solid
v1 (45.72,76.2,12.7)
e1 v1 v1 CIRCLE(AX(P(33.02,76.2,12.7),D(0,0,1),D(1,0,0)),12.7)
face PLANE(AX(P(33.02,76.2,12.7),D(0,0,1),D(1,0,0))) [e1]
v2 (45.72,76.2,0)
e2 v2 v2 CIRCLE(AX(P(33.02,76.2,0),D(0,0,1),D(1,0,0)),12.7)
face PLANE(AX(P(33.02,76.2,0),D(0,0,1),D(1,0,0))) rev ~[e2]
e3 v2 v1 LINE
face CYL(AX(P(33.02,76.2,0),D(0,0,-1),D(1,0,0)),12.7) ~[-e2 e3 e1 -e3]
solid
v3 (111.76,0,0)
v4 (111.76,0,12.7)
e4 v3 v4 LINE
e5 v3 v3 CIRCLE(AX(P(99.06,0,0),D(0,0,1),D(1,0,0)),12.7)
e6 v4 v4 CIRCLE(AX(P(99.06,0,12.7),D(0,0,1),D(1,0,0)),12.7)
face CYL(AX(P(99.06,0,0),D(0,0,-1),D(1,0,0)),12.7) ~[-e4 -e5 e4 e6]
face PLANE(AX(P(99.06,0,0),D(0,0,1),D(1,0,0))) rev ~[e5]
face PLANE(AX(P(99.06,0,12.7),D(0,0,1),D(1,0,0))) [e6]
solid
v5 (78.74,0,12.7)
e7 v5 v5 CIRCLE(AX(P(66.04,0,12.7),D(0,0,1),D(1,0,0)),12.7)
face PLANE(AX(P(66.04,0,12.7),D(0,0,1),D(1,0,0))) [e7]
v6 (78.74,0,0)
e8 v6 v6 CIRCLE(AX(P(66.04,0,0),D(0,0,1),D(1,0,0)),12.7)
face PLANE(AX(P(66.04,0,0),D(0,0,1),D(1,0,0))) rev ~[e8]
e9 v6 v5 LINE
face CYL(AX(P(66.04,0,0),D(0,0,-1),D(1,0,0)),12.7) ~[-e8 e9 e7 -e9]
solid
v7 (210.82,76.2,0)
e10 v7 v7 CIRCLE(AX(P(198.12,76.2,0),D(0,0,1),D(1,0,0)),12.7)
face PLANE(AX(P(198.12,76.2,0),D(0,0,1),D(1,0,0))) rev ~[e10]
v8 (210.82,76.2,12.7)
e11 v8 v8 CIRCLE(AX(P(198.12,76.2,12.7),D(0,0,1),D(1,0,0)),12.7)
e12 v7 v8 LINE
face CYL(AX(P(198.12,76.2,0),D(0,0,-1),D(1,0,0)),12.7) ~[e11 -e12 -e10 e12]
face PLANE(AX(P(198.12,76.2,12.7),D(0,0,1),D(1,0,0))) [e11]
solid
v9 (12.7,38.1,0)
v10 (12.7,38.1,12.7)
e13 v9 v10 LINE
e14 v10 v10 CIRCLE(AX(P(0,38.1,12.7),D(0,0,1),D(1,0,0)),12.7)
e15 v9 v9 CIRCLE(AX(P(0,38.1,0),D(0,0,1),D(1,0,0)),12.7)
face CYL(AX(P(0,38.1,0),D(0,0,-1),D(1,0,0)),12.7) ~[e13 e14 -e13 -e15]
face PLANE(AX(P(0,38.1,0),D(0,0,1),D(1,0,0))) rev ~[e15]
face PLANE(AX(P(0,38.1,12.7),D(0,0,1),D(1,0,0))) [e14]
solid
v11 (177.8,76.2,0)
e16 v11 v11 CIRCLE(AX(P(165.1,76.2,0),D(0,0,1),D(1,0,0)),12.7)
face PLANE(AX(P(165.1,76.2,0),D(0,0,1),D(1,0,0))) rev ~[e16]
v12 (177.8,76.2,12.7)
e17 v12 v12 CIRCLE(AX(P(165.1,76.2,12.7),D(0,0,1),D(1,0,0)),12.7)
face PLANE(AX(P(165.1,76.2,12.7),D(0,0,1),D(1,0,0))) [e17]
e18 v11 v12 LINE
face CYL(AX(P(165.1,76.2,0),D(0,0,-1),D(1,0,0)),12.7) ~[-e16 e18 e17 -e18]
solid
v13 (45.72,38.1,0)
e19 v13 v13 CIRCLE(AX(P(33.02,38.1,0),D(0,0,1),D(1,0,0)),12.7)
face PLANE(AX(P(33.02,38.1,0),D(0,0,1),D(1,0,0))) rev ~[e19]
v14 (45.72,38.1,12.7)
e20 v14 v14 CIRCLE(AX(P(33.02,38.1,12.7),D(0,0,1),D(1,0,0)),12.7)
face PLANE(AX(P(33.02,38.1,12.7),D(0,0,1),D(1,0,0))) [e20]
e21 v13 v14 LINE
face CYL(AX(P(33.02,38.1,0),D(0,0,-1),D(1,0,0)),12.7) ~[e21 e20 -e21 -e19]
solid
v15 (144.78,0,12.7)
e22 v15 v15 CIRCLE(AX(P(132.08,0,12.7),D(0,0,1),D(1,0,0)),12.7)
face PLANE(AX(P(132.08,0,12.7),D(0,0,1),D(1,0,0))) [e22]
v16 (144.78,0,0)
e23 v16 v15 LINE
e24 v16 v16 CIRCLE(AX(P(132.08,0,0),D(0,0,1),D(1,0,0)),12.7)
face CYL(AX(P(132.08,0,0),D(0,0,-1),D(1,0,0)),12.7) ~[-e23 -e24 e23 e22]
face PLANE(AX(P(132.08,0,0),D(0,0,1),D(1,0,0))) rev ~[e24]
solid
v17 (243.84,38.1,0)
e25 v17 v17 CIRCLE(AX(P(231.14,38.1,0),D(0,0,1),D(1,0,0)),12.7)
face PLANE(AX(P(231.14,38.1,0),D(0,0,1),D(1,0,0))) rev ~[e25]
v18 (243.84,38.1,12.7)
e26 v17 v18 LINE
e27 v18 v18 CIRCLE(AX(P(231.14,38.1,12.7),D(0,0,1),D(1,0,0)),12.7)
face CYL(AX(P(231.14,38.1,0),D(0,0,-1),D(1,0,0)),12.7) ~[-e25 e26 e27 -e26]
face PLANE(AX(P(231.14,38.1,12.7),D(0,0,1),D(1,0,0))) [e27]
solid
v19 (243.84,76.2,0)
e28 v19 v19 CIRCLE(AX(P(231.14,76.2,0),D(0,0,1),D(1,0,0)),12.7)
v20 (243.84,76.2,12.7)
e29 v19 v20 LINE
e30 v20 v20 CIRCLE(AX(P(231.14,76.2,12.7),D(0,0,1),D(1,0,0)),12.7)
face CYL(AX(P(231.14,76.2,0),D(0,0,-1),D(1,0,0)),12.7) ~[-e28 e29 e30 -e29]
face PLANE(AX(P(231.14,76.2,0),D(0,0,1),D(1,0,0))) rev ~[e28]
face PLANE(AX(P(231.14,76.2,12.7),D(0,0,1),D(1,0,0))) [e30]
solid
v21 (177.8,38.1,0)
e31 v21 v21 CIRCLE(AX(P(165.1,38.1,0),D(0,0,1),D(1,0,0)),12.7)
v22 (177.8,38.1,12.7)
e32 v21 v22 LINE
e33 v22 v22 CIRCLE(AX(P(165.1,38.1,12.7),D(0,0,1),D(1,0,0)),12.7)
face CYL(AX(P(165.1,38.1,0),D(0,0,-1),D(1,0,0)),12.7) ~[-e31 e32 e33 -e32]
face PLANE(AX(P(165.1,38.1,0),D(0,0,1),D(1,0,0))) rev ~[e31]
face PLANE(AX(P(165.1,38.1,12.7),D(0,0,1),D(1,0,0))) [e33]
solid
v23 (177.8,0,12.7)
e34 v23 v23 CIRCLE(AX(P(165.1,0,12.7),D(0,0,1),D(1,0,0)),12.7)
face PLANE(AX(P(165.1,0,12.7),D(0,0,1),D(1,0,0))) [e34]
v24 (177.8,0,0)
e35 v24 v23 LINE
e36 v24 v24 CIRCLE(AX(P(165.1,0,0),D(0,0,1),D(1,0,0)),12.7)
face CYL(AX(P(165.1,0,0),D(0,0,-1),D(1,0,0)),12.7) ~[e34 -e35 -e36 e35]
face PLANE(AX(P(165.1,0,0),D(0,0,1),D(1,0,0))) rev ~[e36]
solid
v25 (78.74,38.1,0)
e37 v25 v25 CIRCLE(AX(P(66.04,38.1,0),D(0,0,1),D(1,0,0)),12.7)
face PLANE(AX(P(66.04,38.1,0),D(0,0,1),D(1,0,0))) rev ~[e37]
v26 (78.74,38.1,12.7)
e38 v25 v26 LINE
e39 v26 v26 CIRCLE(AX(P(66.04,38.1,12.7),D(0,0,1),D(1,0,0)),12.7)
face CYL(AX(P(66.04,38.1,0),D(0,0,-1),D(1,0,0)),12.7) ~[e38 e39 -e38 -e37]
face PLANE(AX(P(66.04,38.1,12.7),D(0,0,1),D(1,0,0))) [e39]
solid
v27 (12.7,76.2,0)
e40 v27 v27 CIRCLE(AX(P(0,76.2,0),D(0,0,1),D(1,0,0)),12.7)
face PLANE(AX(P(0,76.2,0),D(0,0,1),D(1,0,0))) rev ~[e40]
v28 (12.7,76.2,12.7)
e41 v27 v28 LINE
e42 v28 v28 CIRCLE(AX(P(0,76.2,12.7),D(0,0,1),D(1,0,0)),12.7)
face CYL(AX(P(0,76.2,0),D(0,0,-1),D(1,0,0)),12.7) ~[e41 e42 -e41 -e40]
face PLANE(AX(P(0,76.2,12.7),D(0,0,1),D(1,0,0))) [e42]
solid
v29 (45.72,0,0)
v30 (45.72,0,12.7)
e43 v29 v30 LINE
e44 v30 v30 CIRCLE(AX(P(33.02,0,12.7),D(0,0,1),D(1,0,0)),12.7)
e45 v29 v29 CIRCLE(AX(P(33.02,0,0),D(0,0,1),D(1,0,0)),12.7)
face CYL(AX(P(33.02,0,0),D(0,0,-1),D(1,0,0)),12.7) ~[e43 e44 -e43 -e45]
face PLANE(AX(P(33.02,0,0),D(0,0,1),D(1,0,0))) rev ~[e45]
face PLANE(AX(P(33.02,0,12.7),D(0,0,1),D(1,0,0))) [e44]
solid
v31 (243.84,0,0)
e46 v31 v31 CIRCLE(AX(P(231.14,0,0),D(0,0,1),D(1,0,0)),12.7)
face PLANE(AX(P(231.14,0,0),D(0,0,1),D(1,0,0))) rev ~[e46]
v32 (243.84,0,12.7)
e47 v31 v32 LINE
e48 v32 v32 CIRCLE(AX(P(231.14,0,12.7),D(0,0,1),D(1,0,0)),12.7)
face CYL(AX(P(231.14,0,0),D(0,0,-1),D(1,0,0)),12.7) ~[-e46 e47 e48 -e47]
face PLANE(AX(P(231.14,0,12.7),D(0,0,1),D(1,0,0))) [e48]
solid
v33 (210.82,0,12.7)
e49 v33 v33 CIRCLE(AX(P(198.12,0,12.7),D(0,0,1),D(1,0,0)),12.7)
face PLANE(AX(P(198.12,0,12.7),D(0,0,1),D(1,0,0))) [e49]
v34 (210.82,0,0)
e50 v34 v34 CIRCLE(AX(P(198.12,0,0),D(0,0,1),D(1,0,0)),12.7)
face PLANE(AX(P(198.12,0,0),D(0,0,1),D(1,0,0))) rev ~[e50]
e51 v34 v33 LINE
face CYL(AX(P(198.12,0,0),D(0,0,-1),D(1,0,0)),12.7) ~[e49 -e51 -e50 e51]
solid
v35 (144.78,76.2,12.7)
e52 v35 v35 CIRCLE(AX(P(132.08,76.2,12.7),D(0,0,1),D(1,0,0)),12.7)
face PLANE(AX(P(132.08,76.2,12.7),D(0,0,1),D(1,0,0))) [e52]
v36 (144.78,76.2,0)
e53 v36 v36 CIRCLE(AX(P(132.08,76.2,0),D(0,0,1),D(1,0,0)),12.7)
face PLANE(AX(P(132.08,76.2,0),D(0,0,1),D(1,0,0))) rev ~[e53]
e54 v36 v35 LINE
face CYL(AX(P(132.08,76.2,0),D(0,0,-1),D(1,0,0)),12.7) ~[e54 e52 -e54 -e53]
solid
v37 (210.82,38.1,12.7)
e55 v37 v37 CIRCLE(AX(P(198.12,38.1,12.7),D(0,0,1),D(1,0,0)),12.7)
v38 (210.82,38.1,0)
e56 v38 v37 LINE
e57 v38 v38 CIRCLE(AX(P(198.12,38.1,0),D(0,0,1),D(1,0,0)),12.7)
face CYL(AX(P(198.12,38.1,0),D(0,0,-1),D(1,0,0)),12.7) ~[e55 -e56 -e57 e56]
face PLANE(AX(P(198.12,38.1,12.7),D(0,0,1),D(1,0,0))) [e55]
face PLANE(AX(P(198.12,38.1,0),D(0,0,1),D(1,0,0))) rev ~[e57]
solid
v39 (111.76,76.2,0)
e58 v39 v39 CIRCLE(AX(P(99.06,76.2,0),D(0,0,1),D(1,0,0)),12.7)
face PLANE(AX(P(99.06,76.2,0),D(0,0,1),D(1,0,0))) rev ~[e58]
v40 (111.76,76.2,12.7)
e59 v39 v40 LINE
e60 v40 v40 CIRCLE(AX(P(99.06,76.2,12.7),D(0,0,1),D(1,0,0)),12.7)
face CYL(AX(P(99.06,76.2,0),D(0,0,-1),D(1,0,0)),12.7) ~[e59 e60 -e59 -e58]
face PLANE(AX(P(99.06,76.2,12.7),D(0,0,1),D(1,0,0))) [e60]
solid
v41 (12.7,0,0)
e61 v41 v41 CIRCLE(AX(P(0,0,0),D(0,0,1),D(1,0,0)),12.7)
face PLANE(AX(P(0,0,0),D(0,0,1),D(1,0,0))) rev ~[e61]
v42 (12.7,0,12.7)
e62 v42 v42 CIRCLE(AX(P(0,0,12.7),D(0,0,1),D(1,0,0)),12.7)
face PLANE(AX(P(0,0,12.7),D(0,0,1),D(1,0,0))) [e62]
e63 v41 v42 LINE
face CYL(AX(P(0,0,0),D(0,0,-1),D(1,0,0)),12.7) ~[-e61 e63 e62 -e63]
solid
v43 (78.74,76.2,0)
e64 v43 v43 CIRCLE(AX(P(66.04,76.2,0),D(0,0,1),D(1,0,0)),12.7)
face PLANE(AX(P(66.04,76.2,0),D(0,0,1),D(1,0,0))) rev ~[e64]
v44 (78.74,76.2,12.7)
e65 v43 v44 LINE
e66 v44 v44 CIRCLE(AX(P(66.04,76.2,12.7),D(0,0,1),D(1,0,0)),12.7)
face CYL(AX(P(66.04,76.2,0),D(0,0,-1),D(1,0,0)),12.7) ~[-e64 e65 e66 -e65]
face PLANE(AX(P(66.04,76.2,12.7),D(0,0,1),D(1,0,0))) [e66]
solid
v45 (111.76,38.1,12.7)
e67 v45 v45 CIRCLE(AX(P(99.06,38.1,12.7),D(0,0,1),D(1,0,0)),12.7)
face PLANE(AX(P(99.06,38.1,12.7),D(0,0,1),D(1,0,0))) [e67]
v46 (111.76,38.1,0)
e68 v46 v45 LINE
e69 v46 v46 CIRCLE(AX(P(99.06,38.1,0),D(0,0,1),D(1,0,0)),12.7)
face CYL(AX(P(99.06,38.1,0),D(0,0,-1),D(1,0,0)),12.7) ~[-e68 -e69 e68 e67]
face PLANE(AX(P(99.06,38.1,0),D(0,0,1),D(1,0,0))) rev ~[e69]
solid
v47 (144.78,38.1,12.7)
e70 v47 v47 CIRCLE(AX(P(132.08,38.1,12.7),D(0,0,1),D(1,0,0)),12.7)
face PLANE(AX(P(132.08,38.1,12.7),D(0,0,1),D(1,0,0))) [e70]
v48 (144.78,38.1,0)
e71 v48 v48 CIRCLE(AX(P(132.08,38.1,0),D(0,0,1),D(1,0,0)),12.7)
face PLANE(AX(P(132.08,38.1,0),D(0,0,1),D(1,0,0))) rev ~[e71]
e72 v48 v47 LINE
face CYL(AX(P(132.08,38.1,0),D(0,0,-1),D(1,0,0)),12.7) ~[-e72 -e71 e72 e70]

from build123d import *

# Parameters (mm, degrees)
F0_R     = 12.7
F1_DEPTH = 12.7


# Not quite as in the source:
# - a feature names something its author has since deleted; it is built from what else it names


with BuildPart() as f1:
    # F0 (on Top) → F1 (new body)
    with BuildSketch(Plane.XY):
        with Locations((231.14, 0)):
            Circle(F0_R)
    extrude(amount=F1_DEPTH)


with BuildPart() as f1b:
    # F0 (on Top) → F1, piece 2 (new body)
    with BuildSketch(Plane.XY):
        with Locations((198.12, 0)):
            Circle(F0_R)
    extrude(amount=F1_DEPTH)


with BuildPart() as f1c:
    # F0 (on Top) → F1, piece 3 (new body)
    with BuildSketch(Plane.XY):
        with Locations((165.1, 0)):
            Circle(F0_R)
    extrude(amount=F1_DEPTH)


with BuildPart() as f1d:
    # F0 (on Top) → F1, piece 4 (new body)
    with BuildSketch(Plane.XY):
        with Locations((132.08, 0)):
            Circle(F0_R)
    extrude(amount=F1_DEPTH)


with BuildPart() as f1e:
    # F0 (on Top) → F1, piece 5 (new body)
    with BuildSketch(Plane.XY):
        with Locations((99.06, 0)):
            Circle(F0_R)
    extrude(amount=F1_DEPTH)


with BuildPart() as f1f:
    # F0 (on Top) → F1, piece 6 (new body)
    with BuildSketch(Plane.XY):
        with Locations((33.02, 0)):
            Circle(F0_R)
    extrude(amount=F1_DEPTH)


with BuildPart() as f1g:
    # F0 (on Top) → F1, piece 7 (new body)
    with BuildSketch(Plane.XY):
        with Locations((66.04, 0)):
            Circle(F0_R)
    extrude(amount=F1_DEPTH)


with BuildPart() as f1h:
    # F0 (on Top) → F1, piece 8 (new body)
    with BuildSketch(Plane.XY):
        Circle(F0_R)
    extrude(amount=F1_DEPTH)


with BuildPart() as f1i:
    # F0 (on Top) → F1, piece 9 (new body)
    with BuildSketch(Plane.XY):
        with Locations((0, 38.1)):
            Circle(F0_R)
    extrude(amount=F1_DEPTH)


with BuildPart() as f1j:
    # F0 (on Top) → F1, piece 10 (new body)
    with BuildSketch(Plane.XY):
        with Locations((33.02, 38.1)):
            Circle(F0_R)
    extrude(amount=F1_DEPTH)


with BuildPart() as f1k:
    # F0 (on Top) → F1, piece 11 (new body)
    with BuildSketch(Plane.XY):
        with Locations((66.04, 38.1)):
            Circle(F0_R)
    extrude(amount=F1_DEPTH)


with BuildPart() as f1l:
    # F0 (on Top) → F1, piece 12 (new body)
    with BuildSketch(Plane.XY):
        with Locations((99.06, 38.1)):
            Circle(F0_R)
    extrude(amount=F1_DEPTH)


with BuildPart() as f1m:
    # F0 (on Top) → F1, piece 13 (new body)
    with BuildSketch(Plane.XY):
        with Locations((132.08, 38.1)):
            Circle(F0_R)
    extrude(amount=F1_DEPTH)


with BuildPart() as f1n:
    # F0 (on Top) → F1, piece 14 (new body)
    with BuildSketch(Plane.XY):
        with Locations((165.1, 38.1)):
            Circle(F0_R)
    extrude(amount=F1_DEPTH)


with BuildPart() as f1o:
    # F0 (on Top) → F1, piece 15 (new body)
    with BuildSketch(Plane.XY):
        with Locations((198.12, 38.1)):
            Circle(F0_R)
    extrude(amount=F1_DEPTH)


with BuildPart() as f1p:
    # F0 (on Top) → F1, piece 16 (new body)
    with BuildSketch(Plane.XY):
        with Locations((231.14, 38.1)):
            Circle(F0_R)
    extrude(amount=F1_DEPTH)


with BuildPart() as f1q:
    # F0 (on Top) → F1, piece 17 (new body)
    with BuildSketch(Plane.XY):
        with Locations((198.12, 76.2)):
            Circle(F0_R)
    extrude(amount=F1_DEPTH)


with BuildPart() as f1r:
    # F0 (on Top) → F1, piece 18 (new body)
    with BuildSketch(Plane.XY):
        with Locations((165.1, 76.2)):
            Circle(F0_R)
    extrude(amount=F1_DEPTH)


with BuildPart() as f1s:
    # F0 (on Top) → F1, piece 19 (new body)
    with BuildSketch(Plane.XY):
        with Locations((132.08, 76.2)):
            Circle(F0_R)
    extrude(amount=F1_DEPTH)


with BuildPart() as f1t:
    # F0 (on Top) → F1, piece 20 (new body)
    with BuildSketch(Plane.XY):
        with Locations((99.06, 76.2)):
            Circle(F0_R)
    extrude(amount=F1_DEPTH)


with BuildPart() as f1u:
    # F0 (on Top) → F1, piece 21 (new body)
    with BuildSketch(Plane.XY):
        with Locations((66.04, 76.2)):
            Circle(F0_R)
    extrude(amount=F1_DEPTH)


with BuildPart() as f1v:
    # F0 (on Top) → F1, piece 22 (new body)
    with BuildSketch(Plane.XY):
        with Locations((33.02, 76.2)):
            Circle(F0_R)
    extrude(amount=F1_DEPTH)


with BuildPart() as f1w:
    # F0 (on Top) → F1, piece 23 (new body)
    with BuildSketch(Plane.XY):
        with Locations((0, 76.2)):
            Circle(F0_R)
    extrude(amount=F1_DEPTH)


with BuildPart() as f1x:
    # F0 (on Top) → F1, piece 24 (new body)
    with BuildSketch(Plane.XY):
        with Locations((231.14, 76.2)):
            Circle(F0_R)
    extrude(amount=F1_DEPTH)


solid = Compound([f1.part, f1b.part, f1c.part, f1d.part, f1e.part, f1f.part, f1g.part, f1h.part, f1i.part, f1j.part, f1k.part, f1l.part, f1m.part, f1n.part, f1o.part, f1p.part, f1q.part, f1r.part, f1s.part, f1t.part, f1u.part, f1v.part, f1w.part, f1x.part])
